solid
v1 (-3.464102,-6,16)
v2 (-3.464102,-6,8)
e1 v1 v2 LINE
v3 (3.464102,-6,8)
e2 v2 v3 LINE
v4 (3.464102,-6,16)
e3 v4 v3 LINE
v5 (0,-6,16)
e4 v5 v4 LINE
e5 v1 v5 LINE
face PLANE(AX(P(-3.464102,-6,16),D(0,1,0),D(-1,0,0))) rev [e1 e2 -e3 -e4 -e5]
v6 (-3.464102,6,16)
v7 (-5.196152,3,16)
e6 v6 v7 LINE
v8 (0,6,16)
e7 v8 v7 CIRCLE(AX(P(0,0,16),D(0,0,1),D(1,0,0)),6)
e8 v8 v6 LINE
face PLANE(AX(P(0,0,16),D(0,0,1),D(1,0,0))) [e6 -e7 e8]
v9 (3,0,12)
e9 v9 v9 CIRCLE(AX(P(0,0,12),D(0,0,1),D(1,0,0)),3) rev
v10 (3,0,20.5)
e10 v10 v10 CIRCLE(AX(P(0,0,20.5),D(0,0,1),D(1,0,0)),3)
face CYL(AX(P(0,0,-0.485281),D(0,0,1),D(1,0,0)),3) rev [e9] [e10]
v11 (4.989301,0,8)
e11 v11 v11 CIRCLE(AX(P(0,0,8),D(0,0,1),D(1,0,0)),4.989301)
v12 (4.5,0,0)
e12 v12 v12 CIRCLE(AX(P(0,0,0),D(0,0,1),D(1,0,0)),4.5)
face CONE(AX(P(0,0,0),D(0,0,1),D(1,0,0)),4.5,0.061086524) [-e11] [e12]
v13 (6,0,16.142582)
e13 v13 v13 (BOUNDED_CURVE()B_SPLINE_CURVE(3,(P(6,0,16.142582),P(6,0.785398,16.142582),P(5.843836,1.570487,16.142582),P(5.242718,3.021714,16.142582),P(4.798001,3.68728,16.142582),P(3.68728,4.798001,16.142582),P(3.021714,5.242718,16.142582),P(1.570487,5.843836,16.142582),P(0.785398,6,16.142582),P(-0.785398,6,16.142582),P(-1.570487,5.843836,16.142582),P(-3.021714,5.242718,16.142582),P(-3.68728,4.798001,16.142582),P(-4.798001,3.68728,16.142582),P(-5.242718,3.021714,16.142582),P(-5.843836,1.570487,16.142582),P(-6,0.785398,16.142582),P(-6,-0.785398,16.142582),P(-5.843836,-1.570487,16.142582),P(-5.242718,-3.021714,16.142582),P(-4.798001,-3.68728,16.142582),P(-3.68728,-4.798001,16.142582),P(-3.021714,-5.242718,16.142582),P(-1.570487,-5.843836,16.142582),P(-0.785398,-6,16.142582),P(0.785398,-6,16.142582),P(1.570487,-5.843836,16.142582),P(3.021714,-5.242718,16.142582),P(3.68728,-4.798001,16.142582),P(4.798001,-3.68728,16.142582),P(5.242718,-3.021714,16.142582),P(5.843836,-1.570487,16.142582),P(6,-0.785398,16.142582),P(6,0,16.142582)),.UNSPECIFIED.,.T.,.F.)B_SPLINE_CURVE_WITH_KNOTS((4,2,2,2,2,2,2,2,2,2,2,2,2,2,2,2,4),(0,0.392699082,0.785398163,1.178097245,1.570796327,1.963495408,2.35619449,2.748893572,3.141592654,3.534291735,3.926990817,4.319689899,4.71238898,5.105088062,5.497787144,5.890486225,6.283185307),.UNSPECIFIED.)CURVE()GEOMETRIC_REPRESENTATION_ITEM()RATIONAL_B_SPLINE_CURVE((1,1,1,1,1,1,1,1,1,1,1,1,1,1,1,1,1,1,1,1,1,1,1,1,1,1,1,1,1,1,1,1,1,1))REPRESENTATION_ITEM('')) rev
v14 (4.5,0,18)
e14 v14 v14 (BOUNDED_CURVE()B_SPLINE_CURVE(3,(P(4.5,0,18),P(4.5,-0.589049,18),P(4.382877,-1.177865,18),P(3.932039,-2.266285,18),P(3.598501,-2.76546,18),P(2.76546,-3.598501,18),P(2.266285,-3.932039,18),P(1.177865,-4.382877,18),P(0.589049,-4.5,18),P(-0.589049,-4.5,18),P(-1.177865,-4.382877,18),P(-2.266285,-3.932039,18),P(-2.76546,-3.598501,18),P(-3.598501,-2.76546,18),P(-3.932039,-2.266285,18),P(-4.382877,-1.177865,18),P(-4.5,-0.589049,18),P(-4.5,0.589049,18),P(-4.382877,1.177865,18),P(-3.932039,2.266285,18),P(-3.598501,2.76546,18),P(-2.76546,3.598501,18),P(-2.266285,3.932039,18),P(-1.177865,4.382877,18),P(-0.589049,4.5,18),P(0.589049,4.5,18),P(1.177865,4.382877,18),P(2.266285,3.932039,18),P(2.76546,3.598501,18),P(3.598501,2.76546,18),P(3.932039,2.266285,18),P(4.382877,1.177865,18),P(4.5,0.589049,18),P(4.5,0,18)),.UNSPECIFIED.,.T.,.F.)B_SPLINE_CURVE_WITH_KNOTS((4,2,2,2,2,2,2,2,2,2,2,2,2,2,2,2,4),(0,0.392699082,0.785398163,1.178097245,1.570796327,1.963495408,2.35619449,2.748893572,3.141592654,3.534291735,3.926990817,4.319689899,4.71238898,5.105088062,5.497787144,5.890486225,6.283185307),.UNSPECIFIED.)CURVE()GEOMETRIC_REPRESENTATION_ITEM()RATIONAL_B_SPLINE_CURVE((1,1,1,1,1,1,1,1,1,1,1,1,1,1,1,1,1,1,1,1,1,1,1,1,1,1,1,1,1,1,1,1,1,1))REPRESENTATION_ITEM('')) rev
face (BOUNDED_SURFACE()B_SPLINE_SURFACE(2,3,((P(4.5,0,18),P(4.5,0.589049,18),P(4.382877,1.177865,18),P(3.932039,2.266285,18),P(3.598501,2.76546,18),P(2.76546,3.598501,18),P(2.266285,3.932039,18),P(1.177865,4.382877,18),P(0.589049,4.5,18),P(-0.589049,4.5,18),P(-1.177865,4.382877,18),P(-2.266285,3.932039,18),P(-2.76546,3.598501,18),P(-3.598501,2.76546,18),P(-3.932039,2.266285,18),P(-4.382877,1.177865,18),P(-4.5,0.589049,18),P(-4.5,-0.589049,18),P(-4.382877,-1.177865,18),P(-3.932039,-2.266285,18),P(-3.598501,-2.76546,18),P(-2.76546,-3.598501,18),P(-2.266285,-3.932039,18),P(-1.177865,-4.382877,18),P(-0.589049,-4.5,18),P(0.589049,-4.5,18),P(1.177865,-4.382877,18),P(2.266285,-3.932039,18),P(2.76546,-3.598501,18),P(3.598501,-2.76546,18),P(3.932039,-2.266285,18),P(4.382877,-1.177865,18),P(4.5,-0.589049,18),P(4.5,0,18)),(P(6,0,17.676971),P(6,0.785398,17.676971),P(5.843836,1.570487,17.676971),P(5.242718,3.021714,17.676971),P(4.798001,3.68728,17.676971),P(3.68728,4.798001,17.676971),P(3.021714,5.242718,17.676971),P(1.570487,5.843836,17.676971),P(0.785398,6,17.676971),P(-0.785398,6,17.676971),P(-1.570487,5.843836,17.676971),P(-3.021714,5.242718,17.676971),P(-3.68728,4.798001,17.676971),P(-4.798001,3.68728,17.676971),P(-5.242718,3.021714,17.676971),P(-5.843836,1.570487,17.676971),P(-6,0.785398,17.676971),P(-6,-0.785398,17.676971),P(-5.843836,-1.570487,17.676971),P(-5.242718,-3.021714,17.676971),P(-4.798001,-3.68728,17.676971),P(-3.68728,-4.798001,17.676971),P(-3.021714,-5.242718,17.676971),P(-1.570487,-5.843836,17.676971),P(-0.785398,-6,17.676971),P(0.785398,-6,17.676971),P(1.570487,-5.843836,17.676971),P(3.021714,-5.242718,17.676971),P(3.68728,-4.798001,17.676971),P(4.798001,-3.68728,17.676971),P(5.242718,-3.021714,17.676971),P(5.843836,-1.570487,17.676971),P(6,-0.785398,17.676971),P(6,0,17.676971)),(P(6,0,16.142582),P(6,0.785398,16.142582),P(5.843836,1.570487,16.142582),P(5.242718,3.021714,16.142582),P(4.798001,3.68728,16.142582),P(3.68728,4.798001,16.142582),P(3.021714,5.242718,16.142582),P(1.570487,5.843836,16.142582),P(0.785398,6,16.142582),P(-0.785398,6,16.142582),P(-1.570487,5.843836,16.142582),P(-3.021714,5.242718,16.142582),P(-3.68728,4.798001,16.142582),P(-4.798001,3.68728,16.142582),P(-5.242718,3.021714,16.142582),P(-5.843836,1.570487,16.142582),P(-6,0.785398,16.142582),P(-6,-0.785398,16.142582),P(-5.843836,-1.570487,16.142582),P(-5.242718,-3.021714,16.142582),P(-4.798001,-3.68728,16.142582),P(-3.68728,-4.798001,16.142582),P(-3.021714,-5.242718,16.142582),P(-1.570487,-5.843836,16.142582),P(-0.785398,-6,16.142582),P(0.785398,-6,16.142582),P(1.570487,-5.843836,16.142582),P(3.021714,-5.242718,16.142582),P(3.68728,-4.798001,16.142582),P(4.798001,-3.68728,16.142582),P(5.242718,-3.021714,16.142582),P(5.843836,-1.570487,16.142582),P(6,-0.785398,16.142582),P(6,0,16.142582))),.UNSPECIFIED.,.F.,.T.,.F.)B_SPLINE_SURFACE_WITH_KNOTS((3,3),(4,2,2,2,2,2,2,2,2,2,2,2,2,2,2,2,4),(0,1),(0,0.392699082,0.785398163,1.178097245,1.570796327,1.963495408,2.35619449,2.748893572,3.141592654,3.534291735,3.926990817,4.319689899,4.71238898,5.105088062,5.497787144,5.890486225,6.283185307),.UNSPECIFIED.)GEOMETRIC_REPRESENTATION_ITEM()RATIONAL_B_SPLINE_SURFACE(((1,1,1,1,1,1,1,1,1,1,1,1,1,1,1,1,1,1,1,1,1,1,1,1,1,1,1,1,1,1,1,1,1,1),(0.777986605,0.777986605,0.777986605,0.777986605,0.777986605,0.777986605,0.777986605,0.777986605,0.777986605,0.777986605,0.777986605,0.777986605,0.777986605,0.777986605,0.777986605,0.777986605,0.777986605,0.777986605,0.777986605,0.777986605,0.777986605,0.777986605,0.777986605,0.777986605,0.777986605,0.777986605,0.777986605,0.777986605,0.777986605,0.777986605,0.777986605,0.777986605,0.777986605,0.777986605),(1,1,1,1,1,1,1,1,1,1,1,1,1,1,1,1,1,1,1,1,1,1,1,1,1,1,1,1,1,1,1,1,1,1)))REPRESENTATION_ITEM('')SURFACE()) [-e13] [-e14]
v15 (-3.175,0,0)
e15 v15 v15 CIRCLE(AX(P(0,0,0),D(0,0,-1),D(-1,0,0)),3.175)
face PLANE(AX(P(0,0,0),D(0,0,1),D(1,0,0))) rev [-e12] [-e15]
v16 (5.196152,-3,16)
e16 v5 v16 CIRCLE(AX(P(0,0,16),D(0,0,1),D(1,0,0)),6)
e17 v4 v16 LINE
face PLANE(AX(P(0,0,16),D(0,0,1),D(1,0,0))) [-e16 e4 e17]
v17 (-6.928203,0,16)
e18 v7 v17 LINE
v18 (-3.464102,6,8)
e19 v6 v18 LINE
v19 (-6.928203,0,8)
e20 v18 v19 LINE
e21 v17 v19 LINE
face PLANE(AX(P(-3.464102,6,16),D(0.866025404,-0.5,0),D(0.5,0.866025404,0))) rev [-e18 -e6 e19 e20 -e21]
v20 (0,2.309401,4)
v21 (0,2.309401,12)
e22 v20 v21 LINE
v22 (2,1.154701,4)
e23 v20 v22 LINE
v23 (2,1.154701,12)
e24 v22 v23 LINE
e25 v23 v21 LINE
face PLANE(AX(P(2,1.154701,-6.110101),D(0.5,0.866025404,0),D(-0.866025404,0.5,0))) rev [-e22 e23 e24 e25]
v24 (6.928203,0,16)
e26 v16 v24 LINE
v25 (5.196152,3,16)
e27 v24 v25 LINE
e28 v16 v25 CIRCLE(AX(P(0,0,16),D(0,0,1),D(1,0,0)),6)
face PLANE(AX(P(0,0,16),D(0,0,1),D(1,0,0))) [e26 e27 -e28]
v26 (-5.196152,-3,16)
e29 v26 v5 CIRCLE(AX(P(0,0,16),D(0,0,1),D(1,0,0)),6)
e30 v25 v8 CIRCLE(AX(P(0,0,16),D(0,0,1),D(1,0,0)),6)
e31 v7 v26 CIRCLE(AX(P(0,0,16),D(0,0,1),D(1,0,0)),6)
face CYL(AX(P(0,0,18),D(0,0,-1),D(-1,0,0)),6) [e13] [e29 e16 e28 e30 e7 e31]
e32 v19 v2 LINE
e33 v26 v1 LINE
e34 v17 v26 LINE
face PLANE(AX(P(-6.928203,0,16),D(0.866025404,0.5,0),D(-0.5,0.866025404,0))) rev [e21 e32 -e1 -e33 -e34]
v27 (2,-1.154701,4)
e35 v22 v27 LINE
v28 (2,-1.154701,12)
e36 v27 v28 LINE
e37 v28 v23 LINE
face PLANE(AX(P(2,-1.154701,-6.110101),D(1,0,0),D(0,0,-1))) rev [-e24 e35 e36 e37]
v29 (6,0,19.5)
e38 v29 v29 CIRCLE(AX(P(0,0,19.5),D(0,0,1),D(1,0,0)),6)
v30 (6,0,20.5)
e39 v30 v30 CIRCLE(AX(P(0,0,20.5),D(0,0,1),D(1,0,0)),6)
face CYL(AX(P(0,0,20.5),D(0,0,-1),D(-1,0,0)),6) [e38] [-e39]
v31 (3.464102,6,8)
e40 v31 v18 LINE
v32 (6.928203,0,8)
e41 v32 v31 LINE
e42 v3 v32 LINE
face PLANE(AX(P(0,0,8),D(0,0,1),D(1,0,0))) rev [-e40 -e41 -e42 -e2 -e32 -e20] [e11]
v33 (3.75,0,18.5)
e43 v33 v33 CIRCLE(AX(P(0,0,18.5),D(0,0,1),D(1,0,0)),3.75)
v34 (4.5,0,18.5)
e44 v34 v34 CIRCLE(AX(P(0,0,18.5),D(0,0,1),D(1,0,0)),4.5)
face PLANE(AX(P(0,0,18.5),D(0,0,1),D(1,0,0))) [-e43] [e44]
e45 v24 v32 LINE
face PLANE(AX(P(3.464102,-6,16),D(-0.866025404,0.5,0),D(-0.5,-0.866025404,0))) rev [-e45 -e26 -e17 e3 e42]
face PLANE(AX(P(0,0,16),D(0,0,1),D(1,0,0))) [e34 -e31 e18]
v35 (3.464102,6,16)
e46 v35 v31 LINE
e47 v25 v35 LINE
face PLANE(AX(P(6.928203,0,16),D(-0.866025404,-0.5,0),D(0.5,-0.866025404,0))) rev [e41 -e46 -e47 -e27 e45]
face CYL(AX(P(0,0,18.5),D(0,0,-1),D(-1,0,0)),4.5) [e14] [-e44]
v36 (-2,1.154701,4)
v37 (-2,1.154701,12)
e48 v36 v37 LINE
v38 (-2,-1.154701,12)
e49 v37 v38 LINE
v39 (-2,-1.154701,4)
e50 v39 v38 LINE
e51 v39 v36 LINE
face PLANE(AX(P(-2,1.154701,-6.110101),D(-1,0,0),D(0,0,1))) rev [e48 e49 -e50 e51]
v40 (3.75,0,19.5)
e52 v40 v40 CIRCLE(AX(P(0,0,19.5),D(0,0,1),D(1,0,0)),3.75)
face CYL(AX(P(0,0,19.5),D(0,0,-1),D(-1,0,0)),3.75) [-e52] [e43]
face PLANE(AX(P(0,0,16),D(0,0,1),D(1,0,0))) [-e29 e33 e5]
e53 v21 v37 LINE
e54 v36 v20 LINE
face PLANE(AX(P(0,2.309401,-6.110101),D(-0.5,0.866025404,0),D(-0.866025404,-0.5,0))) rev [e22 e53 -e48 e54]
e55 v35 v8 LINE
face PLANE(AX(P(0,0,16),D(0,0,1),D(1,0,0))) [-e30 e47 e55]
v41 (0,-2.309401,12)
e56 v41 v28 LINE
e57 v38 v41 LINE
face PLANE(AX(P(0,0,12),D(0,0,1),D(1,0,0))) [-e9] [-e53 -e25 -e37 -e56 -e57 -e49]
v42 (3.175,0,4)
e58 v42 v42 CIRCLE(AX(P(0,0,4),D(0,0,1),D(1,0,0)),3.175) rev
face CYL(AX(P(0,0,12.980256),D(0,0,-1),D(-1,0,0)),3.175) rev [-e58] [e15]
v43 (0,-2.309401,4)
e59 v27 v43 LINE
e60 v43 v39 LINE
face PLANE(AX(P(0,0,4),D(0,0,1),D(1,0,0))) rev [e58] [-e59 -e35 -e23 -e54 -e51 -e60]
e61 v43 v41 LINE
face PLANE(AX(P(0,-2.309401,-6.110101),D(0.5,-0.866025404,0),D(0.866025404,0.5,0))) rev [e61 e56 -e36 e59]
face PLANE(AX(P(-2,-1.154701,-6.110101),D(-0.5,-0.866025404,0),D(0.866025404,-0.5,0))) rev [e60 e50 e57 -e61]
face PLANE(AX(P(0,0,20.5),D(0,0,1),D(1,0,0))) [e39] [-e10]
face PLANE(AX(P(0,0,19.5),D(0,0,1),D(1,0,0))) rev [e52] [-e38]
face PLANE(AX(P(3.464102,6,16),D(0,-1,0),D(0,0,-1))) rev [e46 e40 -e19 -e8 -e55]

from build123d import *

# Parameters (mm, degrees)
SKETCH1_R           = 4.5
BOSS_EXTRUDE1_DEPTH = 8
BOSS_EXTRUDE1_DRAFT = -3.5
BOSS_EXTRUDE2_DEPTH = 8
SKETCH3_R           = 6
BOSS_EXTRUDE3_DEPTH = 2
SKETCH9_R           = 4.5
BOSS_EXTRUDE6_DEPTH = 0.5
FILLET1_R           = 1.9
SKETCH4_R           = 3.75
BOSS_EXTRUDE4_DEPTH = 1
SKETCH5_R           = 6
BOSS_EXTRUDE5_DEPTH = 1
SKETCH6_R           = 3
CUT_EXTRUDE1_DEPTH  = 8.5
CUT_EXTRUDE2_DEPTH  = 8
SKETCH8_R           = 3.175
CUT_EXTRUDE3_DEPTH  = 4


with BuildPart() as part:
    # Sketch1 → Boss-Extrude1 (with draft: the straight prism first)
    with BuildSketch(Plane.XY):
        Circle(SKETCH1_R)
    extrude(amount=BOSS_EXTRUDE1_DEPTH)
    # Boss-Extrude1: the draft: its side faces are tilted about the plane it starts from
    boss_extrude1_sides = [part.faces().sort_by_distance(p)[0] for p in [
        (-4.5, 0, 4),
    ]]
    draft(boss_extrude1_sides, Plane.XY, BOSS_EXTRUDE1_DRAFT)

    # Sketch2 → Boss-Extrude2 (add)
    with BuildSketch(Plane.XY.offset(8)):
        Polygon((6.92820323, 0), (3.464101615, 6), (-3.464101615, 6), (-6.92820323, 0), (-3.464101615, -6), (3.464101615, -6), align=None)
    extrude(amount=BOSS_EXTRUDE2_DEPTH)

    # Sketch3 → Boss-Extrude3 (add)
    with BuildSketch(Plane.XY.offset(16)):
        with Locations(Location((0, 0, 0), (0, 0, 150))):
            Circle(SKETCH3_R)
    extrude(amount=BOSS_EXTRUDE3_DEPTH)

    # Sketch9 → Boss-Extrude6 (add)
    with BuildSketch(Plane.XY.offset(18)):
        Circle(SKETCH9_R)
    extrude(amount=BOSS_EXTRUDE6_DEPTH)

    # Fillet1
    # the kernel refuses this fillet: 1.9 mm, written as the material it takes off along each edge
    with BuildSketch(Plane(origin=(0, 0, 18), x_dir=(-0.8660254037844387, 0.49999999999999994, 0), z_dir=(0.49999999999999994, 0.8660254037844387, 0))) as fillet1_piece_1:
        with BuildLine():
            CenterArc((4.1, -1.857417562), FILLET1_R, 0, 77.846802531)
            Line((4.5, 0), (4.508, 0.037148351))
            ThreePointArc((4.508, 0.037148351), (5.25, 0.038), (6, 0.038))
            Line((6, 0.038), (6.038, 0))
            Line((6.038, 0), (6.038, -1.857417562))
            Line((6.038, -1.857417562), (6, -1.857417562))
        make_face()
    revolve(axis=Axis((0, 0, 18), (0, 0, 1)), mode=Mode.SUBTRACT)

    # Sketch4 → Boss-Extrude4 (add)
    with BuildSketch(Plane.XY.offset(18.5)):
        Circle(SKETCH4_R)
    extrude(amount=BOSS_EXTRUDE4_DEPTH)

    # Sketch5 → Boss-Extrude5 (add)
    with BuildSketch(Plane.XY.offset(19.5)):
        with Locations(Location((0, 0, 0), (0, 0, 150))):
            Circle(SKETCH5_R)
    extrude(amount=BOSS_EXTRUDE5_DEPTH)

    # Sketch6 → Cut-Extrude1 (cut)
    with BuildSketch(Plane.XY.offset(20.5)):
        Circle(SKETCH6_R)
    extrude(amount=-CUT_EXTRUDE1_DEPTH, mode=Mode.SUBTRACT)

    # Sketch7 → Cut-Extrude2 (cut)
    with BuildSketch(Plane.XY.offset(12)):
        Polygon((0, -2.309401077), (2, -1.154700538), (2, 1.154700538), (0, 2.309401077), (-2, 1.154700538), (-2, -1.154700538), align=None)
    extrude(amount=-CUT_EXTRUDE2_DEPTH, mode=Mode.SUBTRACT)

    # Sketch8 → Cut-Extrude3 (cut)
    with BuildSketch(Plane(origin=(0, 0, 0), x_dir=(-1, 0, 0), z_dir=(0, 0, -1))):
        Circle(SKETCH8_R)
    extrude(amount=-CUT_EXTRUDE3_DEPTH, mode=Mode.SUBTRACT)


solid = part.part
